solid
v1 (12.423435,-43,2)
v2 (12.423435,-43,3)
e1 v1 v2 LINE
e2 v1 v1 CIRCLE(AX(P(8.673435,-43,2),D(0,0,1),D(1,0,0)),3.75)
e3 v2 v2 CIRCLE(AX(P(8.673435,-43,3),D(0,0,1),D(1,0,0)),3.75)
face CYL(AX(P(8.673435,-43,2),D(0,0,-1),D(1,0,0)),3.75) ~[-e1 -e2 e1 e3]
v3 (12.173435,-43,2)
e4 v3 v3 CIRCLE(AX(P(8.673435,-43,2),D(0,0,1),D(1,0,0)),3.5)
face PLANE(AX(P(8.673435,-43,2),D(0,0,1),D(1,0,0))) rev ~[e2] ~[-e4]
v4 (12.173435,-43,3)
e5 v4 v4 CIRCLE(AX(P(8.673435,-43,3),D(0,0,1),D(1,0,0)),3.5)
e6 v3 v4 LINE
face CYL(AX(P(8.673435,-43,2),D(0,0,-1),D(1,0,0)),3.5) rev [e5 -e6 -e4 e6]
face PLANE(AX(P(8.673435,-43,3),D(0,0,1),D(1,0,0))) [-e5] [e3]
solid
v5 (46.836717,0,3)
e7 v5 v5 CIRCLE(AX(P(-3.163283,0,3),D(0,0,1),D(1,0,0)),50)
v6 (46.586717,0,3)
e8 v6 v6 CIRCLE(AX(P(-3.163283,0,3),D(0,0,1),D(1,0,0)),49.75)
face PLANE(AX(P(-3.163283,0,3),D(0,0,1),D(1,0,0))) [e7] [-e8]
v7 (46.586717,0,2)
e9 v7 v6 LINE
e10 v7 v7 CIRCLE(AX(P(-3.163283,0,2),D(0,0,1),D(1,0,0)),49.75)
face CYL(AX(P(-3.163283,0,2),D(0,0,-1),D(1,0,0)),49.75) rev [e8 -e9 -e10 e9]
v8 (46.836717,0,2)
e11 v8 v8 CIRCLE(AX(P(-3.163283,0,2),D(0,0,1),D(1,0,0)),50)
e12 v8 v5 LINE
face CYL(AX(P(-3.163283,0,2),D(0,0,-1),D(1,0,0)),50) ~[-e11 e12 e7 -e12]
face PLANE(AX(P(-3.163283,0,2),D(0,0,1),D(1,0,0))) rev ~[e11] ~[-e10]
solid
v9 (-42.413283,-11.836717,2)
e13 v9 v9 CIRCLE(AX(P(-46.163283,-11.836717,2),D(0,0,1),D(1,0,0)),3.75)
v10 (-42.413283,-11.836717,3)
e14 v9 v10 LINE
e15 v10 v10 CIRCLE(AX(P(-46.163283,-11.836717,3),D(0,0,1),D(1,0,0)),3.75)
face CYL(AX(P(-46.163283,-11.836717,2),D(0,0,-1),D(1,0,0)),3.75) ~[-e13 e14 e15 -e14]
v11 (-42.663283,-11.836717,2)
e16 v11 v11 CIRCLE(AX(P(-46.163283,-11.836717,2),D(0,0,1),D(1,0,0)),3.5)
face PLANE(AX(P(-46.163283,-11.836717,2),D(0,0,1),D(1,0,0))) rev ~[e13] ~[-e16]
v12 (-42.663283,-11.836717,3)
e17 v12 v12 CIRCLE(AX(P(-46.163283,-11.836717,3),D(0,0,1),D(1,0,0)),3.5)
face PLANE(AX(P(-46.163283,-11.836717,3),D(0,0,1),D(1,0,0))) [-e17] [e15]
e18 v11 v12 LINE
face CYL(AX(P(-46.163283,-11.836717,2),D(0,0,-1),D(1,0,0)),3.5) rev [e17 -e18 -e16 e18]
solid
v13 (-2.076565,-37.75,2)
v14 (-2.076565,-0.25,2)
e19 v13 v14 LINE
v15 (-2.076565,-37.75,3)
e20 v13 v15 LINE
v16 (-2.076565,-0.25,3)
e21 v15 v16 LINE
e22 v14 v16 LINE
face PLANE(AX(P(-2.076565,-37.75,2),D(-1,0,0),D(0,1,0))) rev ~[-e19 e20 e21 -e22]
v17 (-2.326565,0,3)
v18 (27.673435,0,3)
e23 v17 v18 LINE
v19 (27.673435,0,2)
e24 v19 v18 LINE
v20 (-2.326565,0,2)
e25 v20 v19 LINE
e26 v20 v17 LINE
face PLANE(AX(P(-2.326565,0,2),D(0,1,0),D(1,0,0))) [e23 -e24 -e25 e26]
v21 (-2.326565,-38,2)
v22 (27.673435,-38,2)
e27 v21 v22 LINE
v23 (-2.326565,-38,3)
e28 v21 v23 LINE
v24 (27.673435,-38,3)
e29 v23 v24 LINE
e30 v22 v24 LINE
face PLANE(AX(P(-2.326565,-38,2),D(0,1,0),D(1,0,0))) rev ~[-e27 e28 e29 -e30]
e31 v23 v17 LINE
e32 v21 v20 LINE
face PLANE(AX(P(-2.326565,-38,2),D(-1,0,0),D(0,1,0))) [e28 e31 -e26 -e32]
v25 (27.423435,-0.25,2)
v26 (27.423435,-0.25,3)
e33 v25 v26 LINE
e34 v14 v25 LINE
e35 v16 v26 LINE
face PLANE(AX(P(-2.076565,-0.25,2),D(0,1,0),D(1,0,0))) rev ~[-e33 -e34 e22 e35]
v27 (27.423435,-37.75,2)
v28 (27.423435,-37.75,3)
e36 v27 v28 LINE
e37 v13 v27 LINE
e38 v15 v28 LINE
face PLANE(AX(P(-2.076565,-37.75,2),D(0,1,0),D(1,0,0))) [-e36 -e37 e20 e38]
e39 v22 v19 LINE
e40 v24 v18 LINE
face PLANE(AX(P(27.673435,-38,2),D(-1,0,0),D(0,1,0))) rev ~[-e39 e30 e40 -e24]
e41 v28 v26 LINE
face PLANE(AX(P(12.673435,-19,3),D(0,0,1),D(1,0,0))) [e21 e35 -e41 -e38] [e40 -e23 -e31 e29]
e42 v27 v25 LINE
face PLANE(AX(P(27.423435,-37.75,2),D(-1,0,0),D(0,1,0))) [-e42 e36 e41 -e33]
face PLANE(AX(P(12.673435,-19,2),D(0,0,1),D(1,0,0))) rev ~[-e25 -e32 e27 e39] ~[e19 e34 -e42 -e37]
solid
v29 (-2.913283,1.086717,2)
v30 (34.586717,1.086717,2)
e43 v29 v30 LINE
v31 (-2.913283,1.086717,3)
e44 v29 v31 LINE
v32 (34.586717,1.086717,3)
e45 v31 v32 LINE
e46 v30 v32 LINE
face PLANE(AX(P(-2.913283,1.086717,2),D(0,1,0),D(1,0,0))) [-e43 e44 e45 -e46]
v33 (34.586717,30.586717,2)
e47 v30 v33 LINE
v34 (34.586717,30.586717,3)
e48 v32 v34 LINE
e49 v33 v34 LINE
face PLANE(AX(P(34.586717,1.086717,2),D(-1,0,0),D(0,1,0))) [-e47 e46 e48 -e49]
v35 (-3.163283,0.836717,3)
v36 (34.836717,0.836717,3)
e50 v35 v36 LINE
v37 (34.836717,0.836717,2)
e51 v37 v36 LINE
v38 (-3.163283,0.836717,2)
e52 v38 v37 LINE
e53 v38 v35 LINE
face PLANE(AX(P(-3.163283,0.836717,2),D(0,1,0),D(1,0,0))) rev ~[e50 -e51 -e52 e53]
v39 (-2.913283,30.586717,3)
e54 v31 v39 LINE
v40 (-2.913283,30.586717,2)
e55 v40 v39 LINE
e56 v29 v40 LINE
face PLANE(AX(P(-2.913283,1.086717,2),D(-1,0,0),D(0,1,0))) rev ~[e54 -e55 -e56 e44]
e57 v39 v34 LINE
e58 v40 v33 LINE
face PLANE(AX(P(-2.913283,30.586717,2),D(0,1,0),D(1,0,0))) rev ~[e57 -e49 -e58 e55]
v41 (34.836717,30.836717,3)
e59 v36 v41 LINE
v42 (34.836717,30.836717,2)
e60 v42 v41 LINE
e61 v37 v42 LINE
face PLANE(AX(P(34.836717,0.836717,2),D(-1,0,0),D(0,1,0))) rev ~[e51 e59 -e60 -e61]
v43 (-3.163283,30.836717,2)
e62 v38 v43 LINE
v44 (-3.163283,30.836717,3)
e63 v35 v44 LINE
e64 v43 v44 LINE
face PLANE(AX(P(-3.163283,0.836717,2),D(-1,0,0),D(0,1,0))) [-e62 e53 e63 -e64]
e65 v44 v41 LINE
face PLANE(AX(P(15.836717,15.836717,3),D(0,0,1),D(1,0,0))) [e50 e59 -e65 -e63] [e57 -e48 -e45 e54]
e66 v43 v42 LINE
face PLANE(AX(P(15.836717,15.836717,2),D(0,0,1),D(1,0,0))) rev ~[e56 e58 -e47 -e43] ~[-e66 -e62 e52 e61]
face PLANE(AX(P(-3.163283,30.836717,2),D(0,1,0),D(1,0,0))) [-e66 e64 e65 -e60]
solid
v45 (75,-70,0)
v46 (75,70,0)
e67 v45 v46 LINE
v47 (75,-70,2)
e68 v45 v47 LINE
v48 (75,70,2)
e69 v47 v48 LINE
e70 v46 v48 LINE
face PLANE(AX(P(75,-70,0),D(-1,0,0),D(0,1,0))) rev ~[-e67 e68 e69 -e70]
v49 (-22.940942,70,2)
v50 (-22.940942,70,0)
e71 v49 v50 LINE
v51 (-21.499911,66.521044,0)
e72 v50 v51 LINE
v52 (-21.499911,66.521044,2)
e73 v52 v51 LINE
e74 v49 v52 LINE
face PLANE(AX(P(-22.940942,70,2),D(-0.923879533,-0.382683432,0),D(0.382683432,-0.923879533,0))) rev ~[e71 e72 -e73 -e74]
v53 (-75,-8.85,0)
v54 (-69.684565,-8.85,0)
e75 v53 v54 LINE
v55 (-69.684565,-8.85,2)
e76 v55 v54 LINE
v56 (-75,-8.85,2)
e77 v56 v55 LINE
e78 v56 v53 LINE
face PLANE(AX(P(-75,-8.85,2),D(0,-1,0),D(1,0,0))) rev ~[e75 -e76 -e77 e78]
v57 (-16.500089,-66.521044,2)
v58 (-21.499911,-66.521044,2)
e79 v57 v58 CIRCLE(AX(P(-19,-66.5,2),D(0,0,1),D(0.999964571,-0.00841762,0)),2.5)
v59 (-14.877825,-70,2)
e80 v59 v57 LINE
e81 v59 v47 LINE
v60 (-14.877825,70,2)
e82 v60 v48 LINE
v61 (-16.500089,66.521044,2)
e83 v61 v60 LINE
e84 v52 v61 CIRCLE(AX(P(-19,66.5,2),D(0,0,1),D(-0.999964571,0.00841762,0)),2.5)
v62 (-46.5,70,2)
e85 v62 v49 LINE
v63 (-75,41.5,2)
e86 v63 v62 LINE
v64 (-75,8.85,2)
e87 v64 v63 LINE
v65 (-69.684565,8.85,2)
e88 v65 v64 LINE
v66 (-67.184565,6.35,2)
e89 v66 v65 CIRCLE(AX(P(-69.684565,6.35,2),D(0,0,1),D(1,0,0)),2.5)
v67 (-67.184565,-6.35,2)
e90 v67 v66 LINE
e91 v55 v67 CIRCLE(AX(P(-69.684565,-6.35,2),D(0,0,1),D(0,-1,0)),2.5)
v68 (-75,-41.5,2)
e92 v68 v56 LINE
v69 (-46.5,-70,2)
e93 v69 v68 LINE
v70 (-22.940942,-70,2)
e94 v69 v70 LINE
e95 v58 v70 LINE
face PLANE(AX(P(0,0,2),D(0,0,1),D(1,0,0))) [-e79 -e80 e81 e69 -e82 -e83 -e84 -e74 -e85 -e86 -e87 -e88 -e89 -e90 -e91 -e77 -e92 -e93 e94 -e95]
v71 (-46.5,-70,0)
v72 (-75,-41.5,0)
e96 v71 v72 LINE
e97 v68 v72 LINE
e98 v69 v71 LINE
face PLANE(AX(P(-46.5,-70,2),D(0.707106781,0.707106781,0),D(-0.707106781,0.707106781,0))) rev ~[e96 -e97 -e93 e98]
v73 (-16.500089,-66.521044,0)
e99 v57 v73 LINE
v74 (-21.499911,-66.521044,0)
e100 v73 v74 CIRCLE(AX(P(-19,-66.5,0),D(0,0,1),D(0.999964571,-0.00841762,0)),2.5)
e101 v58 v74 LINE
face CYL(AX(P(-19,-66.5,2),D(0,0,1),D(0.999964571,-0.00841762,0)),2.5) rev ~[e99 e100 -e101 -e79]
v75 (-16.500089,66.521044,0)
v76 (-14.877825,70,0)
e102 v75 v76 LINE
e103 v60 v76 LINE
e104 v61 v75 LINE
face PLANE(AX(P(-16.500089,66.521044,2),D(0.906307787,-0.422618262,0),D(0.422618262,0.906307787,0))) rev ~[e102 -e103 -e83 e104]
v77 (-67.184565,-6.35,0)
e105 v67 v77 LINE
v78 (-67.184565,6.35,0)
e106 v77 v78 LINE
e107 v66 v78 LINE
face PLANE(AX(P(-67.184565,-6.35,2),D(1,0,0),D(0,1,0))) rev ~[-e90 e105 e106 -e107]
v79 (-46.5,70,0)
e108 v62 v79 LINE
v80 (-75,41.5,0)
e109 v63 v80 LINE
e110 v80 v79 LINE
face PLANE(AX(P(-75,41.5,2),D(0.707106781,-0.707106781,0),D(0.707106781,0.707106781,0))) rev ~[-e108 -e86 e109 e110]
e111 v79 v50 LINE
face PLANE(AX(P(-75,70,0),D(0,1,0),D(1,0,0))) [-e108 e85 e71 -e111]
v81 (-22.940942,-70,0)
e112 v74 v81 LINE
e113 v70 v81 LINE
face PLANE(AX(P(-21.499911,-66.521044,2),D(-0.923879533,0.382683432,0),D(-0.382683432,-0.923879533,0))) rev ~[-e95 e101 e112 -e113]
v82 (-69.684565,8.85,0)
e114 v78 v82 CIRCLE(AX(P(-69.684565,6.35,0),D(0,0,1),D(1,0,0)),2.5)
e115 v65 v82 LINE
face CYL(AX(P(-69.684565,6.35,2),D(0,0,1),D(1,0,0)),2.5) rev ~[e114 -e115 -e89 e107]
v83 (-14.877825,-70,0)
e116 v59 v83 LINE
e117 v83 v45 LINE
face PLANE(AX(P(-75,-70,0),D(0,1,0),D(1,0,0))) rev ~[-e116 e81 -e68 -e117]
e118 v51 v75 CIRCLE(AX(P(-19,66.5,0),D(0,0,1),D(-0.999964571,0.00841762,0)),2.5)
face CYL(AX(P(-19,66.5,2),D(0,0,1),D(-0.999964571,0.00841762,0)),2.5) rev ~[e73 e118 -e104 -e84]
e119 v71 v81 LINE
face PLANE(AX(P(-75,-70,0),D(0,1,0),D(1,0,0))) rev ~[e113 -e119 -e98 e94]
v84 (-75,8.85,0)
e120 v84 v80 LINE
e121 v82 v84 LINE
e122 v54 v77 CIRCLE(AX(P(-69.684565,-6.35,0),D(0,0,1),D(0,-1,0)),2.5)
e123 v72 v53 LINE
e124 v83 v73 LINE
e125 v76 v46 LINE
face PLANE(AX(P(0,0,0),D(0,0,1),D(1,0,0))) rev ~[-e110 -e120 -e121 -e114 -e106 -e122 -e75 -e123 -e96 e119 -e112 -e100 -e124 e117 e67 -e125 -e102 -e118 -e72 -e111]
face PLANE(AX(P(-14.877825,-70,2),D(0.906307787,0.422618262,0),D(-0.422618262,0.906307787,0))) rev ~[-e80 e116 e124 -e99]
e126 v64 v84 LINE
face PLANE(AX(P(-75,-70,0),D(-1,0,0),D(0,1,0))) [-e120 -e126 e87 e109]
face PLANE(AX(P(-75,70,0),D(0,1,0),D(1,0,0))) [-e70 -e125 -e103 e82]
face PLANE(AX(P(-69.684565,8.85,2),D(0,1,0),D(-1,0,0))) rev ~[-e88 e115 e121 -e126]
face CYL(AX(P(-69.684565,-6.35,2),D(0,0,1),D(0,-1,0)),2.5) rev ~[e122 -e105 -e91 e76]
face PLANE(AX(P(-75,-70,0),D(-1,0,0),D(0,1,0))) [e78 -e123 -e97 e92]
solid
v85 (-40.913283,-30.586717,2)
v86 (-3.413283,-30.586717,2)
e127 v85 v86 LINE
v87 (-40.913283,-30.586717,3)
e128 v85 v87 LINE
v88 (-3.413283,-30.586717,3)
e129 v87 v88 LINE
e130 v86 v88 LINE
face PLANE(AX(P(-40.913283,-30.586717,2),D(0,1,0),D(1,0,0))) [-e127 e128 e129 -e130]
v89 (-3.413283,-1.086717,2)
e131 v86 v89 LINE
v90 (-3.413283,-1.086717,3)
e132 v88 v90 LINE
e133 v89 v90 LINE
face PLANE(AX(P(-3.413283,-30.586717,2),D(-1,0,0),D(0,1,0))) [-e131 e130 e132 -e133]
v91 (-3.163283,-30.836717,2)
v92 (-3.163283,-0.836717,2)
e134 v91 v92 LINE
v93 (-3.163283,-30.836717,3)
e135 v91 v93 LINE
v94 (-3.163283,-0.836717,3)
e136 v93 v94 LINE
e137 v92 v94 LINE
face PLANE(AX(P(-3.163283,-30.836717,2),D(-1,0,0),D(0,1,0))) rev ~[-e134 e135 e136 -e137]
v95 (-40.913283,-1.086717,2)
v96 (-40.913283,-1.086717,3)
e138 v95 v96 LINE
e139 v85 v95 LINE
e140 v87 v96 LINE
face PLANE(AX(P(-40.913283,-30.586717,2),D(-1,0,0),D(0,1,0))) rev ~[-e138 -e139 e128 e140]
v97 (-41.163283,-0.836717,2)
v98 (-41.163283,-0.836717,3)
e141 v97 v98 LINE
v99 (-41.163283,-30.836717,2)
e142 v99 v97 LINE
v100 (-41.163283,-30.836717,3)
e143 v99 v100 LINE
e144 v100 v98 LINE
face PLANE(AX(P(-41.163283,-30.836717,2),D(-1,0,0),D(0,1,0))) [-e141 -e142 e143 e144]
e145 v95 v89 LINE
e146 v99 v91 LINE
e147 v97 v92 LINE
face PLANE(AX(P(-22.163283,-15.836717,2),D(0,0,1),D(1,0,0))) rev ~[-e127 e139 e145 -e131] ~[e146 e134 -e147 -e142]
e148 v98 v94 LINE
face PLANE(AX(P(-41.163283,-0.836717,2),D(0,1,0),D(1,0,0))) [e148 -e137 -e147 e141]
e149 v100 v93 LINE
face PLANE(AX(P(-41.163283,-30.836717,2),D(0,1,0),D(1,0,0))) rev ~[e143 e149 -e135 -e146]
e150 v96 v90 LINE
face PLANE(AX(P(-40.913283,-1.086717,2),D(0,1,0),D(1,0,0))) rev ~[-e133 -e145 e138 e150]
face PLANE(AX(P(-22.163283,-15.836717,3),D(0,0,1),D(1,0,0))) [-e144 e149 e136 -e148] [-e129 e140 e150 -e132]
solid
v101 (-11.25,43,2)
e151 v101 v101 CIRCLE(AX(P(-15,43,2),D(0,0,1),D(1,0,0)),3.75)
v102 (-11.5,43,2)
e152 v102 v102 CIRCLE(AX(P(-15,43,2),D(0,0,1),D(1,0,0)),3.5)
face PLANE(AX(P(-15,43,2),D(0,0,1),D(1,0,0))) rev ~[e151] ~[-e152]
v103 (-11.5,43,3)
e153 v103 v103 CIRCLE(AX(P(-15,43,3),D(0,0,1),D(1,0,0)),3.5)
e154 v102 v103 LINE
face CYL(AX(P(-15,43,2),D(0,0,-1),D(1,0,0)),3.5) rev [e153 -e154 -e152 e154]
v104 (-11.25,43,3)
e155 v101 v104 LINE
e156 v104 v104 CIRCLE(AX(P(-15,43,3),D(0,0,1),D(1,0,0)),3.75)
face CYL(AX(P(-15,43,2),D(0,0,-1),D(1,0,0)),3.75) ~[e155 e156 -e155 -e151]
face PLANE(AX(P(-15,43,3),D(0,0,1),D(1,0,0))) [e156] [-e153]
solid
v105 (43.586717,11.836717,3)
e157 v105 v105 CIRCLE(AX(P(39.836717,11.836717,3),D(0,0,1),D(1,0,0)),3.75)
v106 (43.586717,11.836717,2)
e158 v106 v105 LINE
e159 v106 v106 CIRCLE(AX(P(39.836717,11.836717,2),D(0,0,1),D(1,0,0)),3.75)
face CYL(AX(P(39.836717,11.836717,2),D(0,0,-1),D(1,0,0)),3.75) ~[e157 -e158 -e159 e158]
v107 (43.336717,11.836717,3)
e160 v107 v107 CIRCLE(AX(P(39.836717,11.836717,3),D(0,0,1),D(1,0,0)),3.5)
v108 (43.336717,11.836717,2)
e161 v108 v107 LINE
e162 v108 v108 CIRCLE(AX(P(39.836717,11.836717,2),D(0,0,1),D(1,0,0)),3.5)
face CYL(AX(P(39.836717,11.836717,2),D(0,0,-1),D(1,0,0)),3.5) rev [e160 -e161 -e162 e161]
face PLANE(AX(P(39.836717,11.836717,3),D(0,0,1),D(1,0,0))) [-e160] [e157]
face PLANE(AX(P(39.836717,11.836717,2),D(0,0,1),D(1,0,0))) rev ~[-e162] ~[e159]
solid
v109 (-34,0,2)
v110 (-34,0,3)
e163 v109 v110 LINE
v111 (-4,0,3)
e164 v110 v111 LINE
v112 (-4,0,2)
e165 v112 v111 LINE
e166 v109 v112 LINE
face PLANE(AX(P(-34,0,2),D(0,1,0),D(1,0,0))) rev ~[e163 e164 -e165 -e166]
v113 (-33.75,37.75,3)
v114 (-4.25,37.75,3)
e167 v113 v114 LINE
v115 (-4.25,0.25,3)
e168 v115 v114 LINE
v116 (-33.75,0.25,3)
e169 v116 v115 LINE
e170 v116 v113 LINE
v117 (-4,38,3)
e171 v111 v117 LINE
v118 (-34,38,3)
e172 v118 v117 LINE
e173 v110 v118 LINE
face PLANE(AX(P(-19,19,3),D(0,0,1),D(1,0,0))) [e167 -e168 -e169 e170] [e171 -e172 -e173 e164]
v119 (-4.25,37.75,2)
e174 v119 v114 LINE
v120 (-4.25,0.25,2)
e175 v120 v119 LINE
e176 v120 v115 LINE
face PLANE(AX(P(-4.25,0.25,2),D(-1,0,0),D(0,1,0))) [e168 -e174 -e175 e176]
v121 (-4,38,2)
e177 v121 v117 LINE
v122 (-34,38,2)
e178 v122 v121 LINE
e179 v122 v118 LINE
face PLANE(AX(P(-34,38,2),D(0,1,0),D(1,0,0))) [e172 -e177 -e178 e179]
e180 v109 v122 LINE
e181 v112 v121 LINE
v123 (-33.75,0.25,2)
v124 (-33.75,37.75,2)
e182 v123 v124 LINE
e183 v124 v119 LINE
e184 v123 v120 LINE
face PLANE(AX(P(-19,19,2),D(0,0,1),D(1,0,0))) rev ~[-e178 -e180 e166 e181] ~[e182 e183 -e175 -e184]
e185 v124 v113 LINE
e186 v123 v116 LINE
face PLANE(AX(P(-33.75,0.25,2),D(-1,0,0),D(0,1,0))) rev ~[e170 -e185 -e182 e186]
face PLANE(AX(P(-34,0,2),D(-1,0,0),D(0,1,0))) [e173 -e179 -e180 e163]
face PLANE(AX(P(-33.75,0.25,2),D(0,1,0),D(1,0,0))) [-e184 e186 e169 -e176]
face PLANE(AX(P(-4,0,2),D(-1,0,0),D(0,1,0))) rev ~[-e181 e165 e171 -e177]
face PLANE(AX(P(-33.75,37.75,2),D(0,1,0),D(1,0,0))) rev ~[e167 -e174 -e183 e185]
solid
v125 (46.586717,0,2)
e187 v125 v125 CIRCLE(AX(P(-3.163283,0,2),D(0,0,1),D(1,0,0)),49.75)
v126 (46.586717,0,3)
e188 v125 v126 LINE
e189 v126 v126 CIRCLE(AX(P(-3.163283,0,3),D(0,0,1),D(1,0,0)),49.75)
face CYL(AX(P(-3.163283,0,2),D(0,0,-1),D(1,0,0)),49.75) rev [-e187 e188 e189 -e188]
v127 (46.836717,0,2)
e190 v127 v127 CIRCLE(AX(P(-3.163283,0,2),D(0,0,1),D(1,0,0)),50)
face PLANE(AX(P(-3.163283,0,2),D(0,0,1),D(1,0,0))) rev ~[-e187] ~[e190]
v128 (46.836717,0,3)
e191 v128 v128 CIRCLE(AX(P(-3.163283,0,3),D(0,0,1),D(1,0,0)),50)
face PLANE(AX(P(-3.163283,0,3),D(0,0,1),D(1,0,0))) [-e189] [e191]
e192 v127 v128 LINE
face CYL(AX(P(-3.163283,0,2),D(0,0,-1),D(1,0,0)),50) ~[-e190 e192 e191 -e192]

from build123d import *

# Parameters (mm, degrees)
F0_W     = 150
F0_H     = 140
F1_DEPTH = 2
F2_R     = 2.5
F3_DEPTH = 5
F4_R     = 50
F4_R_2   = 49.75
F5_DEPTH = 1
F6_DEPTH = 1
F4_W     = 38
F4_H     = 30
F4_W_2   = 37.5
F4_H_2   = 29.5
F4_R_3   = 3.75
F4_R_4   = 3.5
F4_W_3   = 30
F4_H_3   = 38
F4_W_4   = 29.5
F4_H_4   = 37.5


# Not quite as in the source:
# - a feature names something its author has since deleted; it is built from what else it names


with BuildPart() as f1:
    # F0 (on Top) → F1 (new body)
    with BuildSketch(Plane.XY):
        Rectangle(F0_W, F0_H)
    extrude(amount=F1_DEPTH)

    # F2 (on face) → F3 (cut)
    with BuildSketch(Plane.XY.offset(2)):
        Polygon((-75, 70), (-75, 41.5), (-46.5, 70), align=None)
        with Locations((-64, 57.6)):
            Circle(F2_R, mode=Mode.SUBTRACT)
        Polygon((-46.5, -70), (-75, -41.5), (-75, -70), align=None)
        with Locations((-64, -57.6)):
            Circle(F2_R, mode=Mode.SUBTRACT)
        with BuildLine():
            Line((-67.1845650673, -6.35), (-67.1845650673, 6.35))
            ThreePointArc((-67.1845650673, 6.35), (-67.9167981143, 8.117766953), (-69.6845650673, 8.85))
            Line((-69.6845650673, 8.85), (-75, 8.85))
            Line((-75, 8.85), (-75, -8.85))
            Line((-75, -8.85), (-69.6845650673, -8.85))
            ThreePointArc((-69.6845650673, -8.85), (-67.9167981143, -8.117766953), (-67.1845650673, -6.35))
        make_face()
        with BuildLine():
            Line((-21.499911428, -66.5210440509), (-22.940942165, -70))
            Line((-22.940942165, -70), (-14.8778247705, -70))
            Line((-14.8778247705, -70), (-16.500088572, -66.5210440509))
            ThreePointArc((-16.500088572, -66.5210440509), (-19, -64), (-21.499911428, -66.5210440509))
        make_face()
        with BuildLine():
            Line((-14.8778247705, 70), (-22.940942165, 70))
            Line((-22.940942165, 70), (-21.499911428, 66.5210440509))
            ThreePointArc((-21.499911428, 66.5210440509), (-19, 64), (-16.500088572, 66.5210440509))
            Line((-16.500088572, 66.5210440509), (-14.8778247705, 70))
        make_face()
        with Locations((-64, 57.6)):
            Circle(F2_R)
        with Locations((-64, -57.6)):
            Circle(F2_R)
    extrude(amount=-F3_DEPTH, mode=Mode.SUBTRACT)


with BuildPart() as f5:
    # F4 (on face) → F5 (new body)
    with BuildSketch(Plane.XY.offset(2)):
        with Locations((-3.1632825379, 0)):
            Circle(F4_R)
        with Locations((-3.1632825379, 0)):
            Circle(F4_R_2, mode=Mode.SUBTRACT)
    extrude(amount=F5_DEPTH)


with BuildPart() as f6:
    # F4 (on face) → F6 (new body)
    with BuildSketch(Plane.XY.offset(2)):
        with Locations((-3.1632825379, 0)):
            Circle(F4_R)
        with Locations((-3.1632825379, 0)):
            Circle(F4_R_2, mode=Mode.SUBTRACT)
    extrude(amount=F6_DEPTH)


with BuildPart() as f6b:
    # F4 (on face) → F6, piece 2 (new body)
    with BuildSketch(Plane.XY.offset(2)):
        with Locations((-22.1632825379, -15.8367174621)):
            Rectangle(F4_W, F4_H)
        with Locations((-22.1632825379, -15.8367174621)):
            Rectangle(F4_W_2, F4_H_2, mode=Mode.SUBTRACT)
    extrude(amount=F6_DEPTH)


with BuildPart() as f6c:
    # F4 (on face) → F6, piece 3 (new body)
    with BuildSketch(Plane.XY.offset(2)):
        with Locations((-46.1632825379, -11.8367174621)):
            Circle(F4_R_3)
        with Locations((-46.1632825379, -11.8367174621)):
            Circle(F4_R_4, mode=Mode.SUBTRACT)
    extrude(amount=F6_DEPTH)


with BuildPart() as f6d:
    # F4 (on face) → F6, piece 4 (new body)
    with BuildSketch(Plane.XY.offset(2)):
        with Locations((-19, 19)):
            Rectangle(F4_W_3, F4_H_3)
        with Locations((-19, 19)):
            Rectangle(F4_W_4, F4_H_4, mode=Mode.SUBTRACT)
    extrude(amount=F6_DEPTH)


with BuildPart() as f6e:
    # F4 (on face) → F6, piece 5 (new body)
    with BuildSketch(Plane.XY.offset(2)):
        with Locations((15.8367174621, 15.8367174621)):
            Rectangle(F4_W, F4_H)
        with Locations((15.8367174621, 15.8367174621)):
            Rectangle(F4_W_2, F4_H_2, mode=Mode.SUBTRACT)
    extrude(amount=F6_DEPTH)


with BuildPart() as f6f:
    # F4 (on face) → F6, piece 6 (new body)
    with BuildSketch(Plane.XY.offset(2)):
        with Locations((12.6734349243, -19)):
            Rectangle(F4_W_3, F4_H_3)
        with Locations((12.6734349243, -19)):
            Rectangle(F4_W_4, F4_H_4, mode=Mode.SUBTRACT)
    extrude(amount=F6_DEPTH)


with BuildPart() as f6g:
    # F4 (on face) → F6, piece 7 (new body)
    with BuildSketch(Plane.XY.offset(2)):
        with Locations((39.8367174621, 11.8367174621)):
            Circle(F4_R_3)
        with Locations((39.8367174621, 11.8367174621)):
            Circle(F4_R_4, mode=Mode.SUBTRACT)
    extrude(amount=F6_DEPTH)


with BuildPart() as f6h:
    # F4 (on face) → F6, piece 8 (new body)
    with BuildSketch(Plane.XY.offset(2)):
        with Locations((8.6734349243, -43)):
            Circle(F4_R_3)
        with Locations((8.6734349243, -43)):
            Circle(F4_R_4, mode=Mode.SUBTRACT)
    extrude(amount=F6_DEPTH)


with BuildPart() as f6i:
    # F4 (on face) → F6, piece 9 (new body)
    with BuildSketch(Plane.XY.offset(2)):
        with Locations((-15, 43)):
            Circle(F4_R_3)
        with Locations((-15, 43)):
            Circle(F4_R_4, mode=Mode.SUBTRACT)
    extrude(amount=F6_DEPTH)


solid = Compound([f1.part, f5.part, f6.part, f6b.part, f6c.part, f6d.part, f6e.part, f6f.part, f6g.part, f6h.part, f6i.part])
